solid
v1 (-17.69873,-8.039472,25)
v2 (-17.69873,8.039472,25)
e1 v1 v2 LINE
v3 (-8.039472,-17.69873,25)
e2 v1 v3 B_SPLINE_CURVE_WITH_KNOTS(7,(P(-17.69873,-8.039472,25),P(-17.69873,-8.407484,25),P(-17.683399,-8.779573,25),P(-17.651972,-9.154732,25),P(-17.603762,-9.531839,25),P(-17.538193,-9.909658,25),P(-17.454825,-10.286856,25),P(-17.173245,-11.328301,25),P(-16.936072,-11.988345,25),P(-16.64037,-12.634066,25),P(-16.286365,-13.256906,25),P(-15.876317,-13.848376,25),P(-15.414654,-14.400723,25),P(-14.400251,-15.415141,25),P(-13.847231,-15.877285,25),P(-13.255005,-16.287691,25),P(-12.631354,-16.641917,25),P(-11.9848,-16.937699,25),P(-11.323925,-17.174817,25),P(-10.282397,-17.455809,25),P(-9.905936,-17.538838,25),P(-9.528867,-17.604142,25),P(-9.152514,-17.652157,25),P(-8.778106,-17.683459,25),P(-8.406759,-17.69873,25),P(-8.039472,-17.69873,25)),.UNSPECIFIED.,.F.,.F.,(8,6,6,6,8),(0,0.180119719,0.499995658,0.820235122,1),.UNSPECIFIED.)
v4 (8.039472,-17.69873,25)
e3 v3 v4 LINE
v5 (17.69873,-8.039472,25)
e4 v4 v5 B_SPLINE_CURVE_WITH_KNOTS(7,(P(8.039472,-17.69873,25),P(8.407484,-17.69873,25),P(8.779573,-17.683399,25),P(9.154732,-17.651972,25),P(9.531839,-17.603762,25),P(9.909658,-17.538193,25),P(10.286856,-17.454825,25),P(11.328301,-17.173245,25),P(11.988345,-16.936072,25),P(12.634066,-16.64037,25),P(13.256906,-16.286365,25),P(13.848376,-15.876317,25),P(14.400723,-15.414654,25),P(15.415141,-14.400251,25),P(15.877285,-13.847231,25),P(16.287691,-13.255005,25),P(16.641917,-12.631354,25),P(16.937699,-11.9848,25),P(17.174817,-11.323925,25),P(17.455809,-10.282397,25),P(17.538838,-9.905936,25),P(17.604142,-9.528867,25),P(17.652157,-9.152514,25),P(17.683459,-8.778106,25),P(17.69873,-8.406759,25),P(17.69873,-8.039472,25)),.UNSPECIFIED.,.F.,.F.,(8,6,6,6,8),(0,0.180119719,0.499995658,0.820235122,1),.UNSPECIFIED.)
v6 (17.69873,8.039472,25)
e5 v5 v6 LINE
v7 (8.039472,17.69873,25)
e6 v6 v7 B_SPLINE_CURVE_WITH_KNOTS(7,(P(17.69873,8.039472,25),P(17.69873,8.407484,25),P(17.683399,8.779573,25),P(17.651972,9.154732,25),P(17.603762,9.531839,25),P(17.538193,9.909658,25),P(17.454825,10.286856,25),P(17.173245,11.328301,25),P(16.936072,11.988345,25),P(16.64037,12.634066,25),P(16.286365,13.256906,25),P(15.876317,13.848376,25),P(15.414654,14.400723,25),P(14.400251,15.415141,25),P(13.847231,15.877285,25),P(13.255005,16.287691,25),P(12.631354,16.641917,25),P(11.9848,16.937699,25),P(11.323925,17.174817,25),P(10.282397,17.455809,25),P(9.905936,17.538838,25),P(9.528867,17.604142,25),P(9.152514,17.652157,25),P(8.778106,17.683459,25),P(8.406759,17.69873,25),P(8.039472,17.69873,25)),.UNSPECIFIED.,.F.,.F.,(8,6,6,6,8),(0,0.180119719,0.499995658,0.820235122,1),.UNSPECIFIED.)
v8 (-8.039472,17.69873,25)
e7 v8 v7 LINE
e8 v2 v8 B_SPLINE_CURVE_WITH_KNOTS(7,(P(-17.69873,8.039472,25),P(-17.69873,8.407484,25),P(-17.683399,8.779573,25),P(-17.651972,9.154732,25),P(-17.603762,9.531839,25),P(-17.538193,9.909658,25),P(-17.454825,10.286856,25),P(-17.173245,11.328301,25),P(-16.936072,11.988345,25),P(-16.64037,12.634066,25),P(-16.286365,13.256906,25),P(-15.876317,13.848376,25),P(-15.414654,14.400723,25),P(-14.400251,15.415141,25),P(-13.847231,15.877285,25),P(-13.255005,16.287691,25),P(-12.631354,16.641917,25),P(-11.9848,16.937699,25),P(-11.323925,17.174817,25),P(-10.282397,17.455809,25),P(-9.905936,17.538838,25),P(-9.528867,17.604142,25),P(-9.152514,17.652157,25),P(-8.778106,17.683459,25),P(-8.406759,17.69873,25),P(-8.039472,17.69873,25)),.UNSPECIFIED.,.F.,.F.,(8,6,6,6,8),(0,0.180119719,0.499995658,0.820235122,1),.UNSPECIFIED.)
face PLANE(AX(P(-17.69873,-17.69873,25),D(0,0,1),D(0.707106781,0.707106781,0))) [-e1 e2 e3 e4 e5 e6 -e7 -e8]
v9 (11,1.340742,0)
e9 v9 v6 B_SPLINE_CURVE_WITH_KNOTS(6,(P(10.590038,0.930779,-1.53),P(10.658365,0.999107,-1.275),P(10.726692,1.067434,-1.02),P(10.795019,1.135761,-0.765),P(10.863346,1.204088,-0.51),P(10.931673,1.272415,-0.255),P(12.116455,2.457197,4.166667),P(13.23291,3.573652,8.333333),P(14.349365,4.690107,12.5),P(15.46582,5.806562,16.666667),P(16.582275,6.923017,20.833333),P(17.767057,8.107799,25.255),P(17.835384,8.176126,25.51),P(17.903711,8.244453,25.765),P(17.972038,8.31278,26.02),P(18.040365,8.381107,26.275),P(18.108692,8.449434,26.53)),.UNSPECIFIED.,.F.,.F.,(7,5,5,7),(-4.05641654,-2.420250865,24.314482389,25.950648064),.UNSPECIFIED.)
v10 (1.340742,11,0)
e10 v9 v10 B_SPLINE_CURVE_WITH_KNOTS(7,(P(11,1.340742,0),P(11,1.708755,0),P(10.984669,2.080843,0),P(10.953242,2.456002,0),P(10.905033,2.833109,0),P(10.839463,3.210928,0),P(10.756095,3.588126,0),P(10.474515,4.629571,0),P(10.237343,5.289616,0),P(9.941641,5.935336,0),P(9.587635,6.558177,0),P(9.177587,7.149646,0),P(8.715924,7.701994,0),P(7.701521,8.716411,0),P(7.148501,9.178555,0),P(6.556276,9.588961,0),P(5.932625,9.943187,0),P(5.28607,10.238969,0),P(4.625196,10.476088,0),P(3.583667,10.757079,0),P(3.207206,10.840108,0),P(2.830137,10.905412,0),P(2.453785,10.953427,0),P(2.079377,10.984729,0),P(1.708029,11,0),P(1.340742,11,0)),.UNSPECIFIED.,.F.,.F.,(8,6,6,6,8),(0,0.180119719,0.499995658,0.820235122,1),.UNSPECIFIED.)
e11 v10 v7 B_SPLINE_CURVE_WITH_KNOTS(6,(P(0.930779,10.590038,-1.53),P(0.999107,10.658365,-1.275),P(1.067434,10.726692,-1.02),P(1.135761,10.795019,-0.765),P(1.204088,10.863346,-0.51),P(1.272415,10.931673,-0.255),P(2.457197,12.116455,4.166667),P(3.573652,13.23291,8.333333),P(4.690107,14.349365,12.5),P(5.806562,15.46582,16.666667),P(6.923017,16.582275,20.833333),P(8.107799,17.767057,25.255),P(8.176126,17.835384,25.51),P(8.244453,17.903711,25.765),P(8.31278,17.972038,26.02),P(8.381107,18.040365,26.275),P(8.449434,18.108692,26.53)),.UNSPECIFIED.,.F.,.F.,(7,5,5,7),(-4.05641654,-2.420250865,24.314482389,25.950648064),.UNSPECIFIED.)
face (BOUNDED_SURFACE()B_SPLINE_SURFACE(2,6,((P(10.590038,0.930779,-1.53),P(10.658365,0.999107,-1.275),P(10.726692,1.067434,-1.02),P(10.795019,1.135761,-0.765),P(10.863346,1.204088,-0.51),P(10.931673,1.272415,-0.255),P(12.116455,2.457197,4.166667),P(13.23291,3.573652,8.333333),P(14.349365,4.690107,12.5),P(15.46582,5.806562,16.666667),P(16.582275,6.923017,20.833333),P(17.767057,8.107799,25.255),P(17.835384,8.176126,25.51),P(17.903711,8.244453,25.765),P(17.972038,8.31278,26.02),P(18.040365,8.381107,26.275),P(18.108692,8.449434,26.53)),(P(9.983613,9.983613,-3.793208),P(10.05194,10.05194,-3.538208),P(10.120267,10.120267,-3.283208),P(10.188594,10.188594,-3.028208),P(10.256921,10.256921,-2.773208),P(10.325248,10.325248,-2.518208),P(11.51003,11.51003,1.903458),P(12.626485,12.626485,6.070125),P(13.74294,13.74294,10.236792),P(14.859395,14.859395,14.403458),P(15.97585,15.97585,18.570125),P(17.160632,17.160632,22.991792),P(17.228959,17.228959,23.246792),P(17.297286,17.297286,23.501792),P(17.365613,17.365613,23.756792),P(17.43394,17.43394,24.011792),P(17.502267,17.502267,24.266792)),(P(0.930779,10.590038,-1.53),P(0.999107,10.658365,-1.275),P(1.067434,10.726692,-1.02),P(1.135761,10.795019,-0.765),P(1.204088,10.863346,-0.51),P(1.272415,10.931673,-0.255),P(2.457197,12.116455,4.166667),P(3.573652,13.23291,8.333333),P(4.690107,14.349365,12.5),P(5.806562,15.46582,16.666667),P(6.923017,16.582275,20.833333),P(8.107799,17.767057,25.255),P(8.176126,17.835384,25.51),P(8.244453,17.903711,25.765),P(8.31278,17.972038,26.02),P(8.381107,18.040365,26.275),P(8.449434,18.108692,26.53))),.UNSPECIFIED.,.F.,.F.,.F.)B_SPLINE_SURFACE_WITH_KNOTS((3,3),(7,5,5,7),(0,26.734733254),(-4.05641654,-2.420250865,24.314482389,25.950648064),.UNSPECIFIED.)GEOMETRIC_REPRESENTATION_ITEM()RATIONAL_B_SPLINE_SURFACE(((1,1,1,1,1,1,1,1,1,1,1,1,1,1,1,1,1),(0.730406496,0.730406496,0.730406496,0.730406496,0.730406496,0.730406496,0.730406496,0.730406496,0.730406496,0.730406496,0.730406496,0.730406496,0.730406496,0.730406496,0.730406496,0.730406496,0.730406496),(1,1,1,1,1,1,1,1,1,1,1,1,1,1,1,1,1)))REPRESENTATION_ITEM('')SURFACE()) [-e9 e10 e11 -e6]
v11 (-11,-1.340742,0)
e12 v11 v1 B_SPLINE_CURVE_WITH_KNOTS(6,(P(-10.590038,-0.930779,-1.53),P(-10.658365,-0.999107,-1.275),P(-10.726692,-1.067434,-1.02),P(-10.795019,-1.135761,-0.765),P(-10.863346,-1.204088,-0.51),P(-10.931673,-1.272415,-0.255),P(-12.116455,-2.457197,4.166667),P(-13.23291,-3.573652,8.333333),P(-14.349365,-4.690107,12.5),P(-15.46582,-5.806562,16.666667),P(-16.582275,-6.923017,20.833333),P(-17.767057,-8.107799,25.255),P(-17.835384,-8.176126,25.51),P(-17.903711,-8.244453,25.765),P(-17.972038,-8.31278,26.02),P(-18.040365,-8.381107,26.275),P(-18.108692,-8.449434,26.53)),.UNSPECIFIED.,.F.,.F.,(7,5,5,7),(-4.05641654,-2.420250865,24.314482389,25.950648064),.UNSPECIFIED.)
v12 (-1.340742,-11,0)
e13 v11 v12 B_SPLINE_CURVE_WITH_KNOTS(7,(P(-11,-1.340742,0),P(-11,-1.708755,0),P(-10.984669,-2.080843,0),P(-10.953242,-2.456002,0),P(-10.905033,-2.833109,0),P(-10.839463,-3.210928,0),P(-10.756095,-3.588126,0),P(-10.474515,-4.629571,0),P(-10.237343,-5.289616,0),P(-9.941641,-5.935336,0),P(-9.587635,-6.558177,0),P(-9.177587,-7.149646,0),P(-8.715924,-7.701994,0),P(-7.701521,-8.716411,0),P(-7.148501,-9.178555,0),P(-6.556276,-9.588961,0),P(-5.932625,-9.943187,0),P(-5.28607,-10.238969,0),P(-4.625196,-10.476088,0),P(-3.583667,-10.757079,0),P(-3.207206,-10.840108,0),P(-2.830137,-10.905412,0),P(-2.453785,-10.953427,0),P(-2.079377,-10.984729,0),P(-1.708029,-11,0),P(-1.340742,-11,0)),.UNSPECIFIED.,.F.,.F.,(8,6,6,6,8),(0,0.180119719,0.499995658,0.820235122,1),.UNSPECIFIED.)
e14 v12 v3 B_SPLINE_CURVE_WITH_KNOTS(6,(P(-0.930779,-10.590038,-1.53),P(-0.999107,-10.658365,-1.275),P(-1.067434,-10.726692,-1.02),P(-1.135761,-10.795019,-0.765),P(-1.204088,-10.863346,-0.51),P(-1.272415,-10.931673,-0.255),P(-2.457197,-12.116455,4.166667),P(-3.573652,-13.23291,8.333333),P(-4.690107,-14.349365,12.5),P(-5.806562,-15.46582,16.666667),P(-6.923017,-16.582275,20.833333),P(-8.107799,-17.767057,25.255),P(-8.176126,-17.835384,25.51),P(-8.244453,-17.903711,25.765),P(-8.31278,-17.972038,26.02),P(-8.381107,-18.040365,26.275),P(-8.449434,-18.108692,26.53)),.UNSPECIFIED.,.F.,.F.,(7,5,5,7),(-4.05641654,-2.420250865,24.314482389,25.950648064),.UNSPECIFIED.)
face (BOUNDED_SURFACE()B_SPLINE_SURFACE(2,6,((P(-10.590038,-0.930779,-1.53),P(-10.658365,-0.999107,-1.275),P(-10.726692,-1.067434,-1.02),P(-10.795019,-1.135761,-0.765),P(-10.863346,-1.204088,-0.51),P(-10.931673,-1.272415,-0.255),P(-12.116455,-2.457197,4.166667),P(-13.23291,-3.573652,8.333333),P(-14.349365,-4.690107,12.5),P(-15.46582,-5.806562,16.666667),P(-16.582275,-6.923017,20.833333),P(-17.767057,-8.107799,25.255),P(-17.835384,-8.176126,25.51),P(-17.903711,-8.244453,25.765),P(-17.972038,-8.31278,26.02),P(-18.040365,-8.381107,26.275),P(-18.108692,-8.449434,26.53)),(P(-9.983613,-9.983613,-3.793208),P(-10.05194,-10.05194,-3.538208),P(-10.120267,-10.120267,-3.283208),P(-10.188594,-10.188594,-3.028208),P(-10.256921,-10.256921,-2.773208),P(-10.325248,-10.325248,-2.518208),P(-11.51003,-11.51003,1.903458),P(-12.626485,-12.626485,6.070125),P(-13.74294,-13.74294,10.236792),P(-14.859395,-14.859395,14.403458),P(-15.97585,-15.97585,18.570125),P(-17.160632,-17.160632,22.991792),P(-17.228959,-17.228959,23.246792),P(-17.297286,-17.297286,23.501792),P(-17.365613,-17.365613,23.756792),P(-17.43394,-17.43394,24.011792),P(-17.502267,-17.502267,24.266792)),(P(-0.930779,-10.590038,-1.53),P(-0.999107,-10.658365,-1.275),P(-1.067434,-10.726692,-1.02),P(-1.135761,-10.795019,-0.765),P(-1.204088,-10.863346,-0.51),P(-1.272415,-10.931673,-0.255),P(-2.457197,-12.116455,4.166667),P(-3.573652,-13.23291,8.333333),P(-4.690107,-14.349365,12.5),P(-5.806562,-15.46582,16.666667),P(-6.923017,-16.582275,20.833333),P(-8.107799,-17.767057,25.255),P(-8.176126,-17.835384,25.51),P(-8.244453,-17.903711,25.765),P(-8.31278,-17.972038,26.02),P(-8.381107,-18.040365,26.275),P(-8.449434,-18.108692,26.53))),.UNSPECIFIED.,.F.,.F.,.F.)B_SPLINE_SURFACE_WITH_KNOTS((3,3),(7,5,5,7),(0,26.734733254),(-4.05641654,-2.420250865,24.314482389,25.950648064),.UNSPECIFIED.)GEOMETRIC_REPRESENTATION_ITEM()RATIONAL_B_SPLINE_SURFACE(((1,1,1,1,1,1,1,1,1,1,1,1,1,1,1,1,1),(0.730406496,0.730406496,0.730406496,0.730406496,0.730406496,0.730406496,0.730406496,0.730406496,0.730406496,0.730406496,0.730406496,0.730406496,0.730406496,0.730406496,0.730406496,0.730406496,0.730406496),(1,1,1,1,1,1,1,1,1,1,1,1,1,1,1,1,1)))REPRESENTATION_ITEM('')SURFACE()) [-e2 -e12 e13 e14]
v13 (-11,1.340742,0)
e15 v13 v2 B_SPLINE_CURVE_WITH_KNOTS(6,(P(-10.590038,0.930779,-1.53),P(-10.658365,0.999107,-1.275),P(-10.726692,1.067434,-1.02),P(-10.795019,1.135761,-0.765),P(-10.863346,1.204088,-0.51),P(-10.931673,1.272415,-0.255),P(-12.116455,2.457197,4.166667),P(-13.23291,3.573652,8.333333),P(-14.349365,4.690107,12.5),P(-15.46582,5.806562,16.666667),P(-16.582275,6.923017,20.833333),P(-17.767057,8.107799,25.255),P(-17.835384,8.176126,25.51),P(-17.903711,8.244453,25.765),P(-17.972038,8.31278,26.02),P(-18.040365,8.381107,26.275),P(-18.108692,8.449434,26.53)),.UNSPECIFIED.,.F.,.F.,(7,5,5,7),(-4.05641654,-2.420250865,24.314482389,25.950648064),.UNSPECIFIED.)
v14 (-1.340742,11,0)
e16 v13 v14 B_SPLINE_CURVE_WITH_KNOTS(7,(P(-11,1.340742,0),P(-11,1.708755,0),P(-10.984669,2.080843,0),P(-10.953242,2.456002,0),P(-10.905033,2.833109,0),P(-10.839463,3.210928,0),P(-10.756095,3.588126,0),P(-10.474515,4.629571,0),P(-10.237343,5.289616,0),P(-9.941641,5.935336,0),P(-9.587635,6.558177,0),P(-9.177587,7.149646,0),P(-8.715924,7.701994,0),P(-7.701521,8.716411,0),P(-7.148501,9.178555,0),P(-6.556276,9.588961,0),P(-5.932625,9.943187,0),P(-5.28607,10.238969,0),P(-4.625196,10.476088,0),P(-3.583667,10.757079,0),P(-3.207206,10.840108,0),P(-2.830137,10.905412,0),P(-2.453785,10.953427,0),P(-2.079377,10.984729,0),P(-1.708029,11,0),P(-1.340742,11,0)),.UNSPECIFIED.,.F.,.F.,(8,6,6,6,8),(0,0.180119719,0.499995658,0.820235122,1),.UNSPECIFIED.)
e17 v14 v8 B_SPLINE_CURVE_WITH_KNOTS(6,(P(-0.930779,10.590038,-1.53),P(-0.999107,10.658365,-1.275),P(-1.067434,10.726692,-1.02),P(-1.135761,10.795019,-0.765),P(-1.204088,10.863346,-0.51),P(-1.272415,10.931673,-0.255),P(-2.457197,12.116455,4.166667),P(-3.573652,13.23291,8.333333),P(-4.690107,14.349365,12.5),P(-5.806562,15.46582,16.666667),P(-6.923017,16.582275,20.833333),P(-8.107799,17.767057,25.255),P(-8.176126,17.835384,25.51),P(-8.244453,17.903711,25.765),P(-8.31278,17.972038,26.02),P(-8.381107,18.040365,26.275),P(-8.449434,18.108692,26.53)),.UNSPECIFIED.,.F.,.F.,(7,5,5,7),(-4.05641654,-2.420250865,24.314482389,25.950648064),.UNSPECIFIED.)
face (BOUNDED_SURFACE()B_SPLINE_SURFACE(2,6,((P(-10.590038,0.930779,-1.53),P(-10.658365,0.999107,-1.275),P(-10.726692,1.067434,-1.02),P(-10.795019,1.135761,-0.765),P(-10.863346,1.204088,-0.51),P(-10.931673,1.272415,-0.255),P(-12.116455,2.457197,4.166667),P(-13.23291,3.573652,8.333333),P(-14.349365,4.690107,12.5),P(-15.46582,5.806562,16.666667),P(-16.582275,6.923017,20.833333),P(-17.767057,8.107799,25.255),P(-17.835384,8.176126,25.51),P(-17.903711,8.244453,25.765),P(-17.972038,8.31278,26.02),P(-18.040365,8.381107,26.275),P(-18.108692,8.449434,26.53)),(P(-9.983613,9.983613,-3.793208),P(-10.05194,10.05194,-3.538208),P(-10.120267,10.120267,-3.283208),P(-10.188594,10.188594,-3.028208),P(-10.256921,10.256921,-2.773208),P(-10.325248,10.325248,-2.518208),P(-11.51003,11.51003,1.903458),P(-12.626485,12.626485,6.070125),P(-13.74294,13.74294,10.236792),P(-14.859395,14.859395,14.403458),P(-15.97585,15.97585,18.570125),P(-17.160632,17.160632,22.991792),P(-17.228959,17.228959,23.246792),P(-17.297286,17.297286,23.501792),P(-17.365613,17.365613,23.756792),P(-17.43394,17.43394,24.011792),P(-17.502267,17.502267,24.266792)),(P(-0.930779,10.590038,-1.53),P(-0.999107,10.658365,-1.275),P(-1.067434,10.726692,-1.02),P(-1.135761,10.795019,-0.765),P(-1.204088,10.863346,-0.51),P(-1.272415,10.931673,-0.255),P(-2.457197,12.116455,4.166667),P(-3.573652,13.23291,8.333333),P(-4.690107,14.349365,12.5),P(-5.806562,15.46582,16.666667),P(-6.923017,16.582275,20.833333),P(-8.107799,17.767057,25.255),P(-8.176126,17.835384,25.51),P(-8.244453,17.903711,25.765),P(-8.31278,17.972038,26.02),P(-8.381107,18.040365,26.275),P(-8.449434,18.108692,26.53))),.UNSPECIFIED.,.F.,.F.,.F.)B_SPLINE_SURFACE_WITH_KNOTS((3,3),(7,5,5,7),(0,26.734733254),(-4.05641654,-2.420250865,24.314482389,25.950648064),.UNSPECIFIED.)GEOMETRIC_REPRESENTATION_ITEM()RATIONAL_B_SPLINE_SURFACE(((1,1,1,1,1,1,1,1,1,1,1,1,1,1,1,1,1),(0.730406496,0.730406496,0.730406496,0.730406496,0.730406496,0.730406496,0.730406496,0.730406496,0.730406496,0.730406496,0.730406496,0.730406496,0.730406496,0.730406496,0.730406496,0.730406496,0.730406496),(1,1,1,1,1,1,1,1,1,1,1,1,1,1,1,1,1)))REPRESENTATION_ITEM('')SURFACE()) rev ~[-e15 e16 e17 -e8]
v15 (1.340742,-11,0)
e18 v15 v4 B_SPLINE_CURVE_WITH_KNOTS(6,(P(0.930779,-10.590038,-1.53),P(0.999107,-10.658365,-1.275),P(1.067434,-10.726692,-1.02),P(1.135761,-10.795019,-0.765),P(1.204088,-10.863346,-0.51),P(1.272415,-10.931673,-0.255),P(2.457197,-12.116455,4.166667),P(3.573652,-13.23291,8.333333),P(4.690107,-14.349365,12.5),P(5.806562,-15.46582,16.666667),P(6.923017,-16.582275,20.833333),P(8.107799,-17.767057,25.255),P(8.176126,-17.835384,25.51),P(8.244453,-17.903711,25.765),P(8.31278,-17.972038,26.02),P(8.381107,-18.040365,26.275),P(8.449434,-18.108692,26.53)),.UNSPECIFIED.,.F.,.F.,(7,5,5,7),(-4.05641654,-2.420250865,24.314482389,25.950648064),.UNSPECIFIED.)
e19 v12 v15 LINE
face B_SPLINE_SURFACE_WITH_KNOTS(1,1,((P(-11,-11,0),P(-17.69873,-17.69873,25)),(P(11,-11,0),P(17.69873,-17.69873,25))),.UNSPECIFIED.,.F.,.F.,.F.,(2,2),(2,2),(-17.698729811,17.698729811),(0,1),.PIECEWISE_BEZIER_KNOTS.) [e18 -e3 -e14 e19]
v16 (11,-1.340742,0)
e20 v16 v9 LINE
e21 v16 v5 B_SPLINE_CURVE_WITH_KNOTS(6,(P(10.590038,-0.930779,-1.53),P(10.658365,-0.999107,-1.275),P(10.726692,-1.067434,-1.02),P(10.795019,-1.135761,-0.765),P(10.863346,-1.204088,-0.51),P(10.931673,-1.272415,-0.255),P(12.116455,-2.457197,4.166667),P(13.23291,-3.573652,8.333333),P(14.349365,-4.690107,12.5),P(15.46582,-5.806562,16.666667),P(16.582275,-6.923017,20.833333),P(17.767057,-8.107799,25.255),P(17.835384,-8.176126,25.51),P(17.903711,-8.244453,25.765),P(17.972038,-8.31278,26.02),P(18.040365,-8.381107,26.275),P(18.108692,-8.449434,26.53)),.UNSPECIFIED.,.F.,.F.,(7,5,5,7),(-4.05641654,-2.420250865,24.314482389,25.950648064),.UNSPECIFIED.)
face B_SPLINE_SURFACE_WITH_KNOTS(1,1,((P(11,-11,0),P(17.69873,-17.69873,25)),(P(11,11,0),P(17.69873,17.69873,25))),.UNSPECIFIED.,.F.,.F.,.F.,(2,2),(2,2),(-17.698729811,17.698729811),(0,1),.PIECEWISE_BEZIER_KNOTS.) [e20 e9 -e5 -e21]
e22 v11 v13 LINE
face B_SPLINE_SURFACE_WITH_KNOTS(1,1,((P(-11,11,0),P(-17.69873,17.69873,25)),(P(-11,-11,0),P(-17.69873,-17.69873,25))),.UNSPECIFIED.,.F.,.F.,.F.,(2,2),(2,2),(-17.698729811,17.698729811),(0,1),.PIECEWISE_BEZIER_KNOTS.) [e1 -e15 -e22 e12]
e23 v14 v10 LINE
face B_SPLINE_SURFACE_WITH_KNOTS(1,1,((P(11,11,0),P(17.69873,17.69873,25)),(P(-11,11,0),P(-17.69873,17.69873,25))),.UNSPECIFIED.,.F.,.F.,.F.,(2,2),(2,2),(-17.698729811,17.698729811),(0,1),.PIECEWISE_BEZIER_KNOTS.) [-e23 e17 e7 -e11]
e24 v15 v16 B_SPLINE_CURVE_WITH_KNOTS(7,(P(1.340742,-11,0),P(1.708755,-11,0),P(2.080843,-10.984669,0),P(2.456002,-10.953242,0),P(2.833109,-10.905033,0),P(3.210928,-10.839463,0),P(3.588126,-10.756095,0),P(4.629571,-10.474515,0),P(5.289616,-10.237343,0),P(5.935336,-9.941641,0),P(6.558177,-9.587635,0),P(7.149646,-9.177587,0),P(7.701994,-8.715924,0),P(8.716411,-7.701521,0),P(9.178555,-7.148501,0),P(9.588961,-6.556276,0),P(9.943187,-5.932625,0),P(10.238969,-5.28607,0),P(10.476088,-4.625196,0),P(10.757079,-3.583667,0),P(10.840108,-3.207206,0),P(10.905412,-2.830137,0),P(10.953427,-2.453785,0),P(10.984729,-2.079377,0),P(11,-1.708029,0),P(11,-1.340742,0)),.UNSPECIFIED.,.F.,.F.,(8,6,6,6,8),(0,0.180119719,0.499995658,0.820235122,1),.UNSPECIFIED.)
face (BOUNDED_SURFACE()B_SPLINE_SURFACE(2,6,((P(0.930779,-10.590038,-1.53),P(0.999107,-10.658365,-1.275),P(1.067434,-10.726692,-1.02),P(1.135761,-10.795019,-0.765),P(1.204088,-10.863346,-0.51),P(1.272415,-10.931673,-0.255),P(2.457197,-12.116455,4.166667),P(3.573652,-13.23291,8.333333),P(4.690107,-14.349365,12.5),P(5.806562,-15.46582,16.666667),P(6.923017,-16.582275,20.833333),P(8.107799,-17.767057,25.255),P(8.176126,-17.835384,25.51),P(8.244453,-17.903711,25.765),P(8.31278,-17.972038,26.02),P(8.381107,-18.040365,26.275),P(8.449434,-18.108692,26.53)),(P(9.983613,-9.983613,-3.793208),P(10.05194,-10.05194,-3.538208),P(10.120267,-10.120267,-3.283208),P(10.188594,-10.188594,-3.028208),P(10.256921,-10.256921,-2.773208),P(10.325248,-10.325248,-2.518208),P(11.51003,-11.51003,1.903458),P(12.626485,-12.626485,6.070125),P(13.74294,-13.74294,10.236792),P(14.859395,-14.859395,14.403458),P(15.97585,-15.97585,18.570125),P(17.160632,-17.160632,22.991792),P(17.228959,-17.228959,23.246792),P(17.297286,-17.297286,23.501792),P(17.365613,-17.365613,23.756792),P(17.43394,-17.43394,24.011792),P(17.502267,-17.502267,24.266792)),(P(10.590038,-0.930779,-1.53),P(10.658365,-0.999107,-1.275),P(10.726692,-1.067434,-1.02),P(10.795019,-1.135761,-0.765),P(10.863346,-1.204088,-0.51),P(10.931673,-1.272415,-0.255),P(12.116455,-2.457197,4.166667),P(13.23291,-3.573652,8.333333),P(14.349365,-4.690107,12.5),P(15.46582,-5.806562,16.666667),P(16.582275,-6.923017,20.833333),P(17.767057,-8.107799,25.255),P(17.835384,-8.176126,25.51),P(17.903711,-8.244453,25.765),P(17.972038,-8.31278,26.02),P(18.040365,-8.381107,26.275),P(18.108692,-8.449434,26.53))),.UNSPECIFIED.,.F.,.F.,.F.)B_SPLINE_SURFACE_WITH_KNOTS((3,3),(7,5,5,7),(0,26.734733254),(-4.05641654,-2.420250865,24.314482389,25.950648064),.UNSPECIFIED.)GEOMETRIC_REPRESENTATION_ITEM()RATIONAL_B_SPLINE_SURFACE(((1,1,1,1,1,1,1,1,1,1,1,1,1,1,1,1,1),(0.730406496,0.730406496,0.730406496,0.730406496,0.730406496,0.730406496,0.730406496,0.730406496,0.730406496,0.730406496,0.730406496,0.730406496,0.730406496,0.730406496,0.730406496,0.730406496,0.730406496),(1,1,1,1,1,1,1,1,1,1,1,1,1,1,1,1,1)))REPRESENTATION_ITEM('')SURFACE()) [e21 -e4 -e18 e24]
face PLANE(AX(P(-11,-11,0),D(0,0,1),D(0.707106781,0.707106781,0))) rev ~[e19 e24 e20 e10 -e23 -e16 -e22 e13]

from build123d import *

# Parameters (mm, degrees)
F0_W     = 22
F0_H     = 22
F1_DEPTH = 25
F1_TAPER = -15
F2_R     = 10


with BuildPart() as f1:
    # F0 (on Top) → F1 (new body)
    with BuildSketch(Plane.XY):
        Rectangle(F0_W, F0_H)
    extrude(amount=F1_DEPTH, taper=F1_TAPER)

    # F2
    f2_edges = [f1.edges().sort_by_distance(p)[0] for p in [
        (-14.349365, -14.349365, 12.5),
        (-14.349365, 14.349365, 12.5),
        (14.349365, 14.349365, 12.5),
        (14.349365, -14.349365, 12.5),
    ]]
    fillet(f2_edges, radius=F2_R)


solid = f1.part
